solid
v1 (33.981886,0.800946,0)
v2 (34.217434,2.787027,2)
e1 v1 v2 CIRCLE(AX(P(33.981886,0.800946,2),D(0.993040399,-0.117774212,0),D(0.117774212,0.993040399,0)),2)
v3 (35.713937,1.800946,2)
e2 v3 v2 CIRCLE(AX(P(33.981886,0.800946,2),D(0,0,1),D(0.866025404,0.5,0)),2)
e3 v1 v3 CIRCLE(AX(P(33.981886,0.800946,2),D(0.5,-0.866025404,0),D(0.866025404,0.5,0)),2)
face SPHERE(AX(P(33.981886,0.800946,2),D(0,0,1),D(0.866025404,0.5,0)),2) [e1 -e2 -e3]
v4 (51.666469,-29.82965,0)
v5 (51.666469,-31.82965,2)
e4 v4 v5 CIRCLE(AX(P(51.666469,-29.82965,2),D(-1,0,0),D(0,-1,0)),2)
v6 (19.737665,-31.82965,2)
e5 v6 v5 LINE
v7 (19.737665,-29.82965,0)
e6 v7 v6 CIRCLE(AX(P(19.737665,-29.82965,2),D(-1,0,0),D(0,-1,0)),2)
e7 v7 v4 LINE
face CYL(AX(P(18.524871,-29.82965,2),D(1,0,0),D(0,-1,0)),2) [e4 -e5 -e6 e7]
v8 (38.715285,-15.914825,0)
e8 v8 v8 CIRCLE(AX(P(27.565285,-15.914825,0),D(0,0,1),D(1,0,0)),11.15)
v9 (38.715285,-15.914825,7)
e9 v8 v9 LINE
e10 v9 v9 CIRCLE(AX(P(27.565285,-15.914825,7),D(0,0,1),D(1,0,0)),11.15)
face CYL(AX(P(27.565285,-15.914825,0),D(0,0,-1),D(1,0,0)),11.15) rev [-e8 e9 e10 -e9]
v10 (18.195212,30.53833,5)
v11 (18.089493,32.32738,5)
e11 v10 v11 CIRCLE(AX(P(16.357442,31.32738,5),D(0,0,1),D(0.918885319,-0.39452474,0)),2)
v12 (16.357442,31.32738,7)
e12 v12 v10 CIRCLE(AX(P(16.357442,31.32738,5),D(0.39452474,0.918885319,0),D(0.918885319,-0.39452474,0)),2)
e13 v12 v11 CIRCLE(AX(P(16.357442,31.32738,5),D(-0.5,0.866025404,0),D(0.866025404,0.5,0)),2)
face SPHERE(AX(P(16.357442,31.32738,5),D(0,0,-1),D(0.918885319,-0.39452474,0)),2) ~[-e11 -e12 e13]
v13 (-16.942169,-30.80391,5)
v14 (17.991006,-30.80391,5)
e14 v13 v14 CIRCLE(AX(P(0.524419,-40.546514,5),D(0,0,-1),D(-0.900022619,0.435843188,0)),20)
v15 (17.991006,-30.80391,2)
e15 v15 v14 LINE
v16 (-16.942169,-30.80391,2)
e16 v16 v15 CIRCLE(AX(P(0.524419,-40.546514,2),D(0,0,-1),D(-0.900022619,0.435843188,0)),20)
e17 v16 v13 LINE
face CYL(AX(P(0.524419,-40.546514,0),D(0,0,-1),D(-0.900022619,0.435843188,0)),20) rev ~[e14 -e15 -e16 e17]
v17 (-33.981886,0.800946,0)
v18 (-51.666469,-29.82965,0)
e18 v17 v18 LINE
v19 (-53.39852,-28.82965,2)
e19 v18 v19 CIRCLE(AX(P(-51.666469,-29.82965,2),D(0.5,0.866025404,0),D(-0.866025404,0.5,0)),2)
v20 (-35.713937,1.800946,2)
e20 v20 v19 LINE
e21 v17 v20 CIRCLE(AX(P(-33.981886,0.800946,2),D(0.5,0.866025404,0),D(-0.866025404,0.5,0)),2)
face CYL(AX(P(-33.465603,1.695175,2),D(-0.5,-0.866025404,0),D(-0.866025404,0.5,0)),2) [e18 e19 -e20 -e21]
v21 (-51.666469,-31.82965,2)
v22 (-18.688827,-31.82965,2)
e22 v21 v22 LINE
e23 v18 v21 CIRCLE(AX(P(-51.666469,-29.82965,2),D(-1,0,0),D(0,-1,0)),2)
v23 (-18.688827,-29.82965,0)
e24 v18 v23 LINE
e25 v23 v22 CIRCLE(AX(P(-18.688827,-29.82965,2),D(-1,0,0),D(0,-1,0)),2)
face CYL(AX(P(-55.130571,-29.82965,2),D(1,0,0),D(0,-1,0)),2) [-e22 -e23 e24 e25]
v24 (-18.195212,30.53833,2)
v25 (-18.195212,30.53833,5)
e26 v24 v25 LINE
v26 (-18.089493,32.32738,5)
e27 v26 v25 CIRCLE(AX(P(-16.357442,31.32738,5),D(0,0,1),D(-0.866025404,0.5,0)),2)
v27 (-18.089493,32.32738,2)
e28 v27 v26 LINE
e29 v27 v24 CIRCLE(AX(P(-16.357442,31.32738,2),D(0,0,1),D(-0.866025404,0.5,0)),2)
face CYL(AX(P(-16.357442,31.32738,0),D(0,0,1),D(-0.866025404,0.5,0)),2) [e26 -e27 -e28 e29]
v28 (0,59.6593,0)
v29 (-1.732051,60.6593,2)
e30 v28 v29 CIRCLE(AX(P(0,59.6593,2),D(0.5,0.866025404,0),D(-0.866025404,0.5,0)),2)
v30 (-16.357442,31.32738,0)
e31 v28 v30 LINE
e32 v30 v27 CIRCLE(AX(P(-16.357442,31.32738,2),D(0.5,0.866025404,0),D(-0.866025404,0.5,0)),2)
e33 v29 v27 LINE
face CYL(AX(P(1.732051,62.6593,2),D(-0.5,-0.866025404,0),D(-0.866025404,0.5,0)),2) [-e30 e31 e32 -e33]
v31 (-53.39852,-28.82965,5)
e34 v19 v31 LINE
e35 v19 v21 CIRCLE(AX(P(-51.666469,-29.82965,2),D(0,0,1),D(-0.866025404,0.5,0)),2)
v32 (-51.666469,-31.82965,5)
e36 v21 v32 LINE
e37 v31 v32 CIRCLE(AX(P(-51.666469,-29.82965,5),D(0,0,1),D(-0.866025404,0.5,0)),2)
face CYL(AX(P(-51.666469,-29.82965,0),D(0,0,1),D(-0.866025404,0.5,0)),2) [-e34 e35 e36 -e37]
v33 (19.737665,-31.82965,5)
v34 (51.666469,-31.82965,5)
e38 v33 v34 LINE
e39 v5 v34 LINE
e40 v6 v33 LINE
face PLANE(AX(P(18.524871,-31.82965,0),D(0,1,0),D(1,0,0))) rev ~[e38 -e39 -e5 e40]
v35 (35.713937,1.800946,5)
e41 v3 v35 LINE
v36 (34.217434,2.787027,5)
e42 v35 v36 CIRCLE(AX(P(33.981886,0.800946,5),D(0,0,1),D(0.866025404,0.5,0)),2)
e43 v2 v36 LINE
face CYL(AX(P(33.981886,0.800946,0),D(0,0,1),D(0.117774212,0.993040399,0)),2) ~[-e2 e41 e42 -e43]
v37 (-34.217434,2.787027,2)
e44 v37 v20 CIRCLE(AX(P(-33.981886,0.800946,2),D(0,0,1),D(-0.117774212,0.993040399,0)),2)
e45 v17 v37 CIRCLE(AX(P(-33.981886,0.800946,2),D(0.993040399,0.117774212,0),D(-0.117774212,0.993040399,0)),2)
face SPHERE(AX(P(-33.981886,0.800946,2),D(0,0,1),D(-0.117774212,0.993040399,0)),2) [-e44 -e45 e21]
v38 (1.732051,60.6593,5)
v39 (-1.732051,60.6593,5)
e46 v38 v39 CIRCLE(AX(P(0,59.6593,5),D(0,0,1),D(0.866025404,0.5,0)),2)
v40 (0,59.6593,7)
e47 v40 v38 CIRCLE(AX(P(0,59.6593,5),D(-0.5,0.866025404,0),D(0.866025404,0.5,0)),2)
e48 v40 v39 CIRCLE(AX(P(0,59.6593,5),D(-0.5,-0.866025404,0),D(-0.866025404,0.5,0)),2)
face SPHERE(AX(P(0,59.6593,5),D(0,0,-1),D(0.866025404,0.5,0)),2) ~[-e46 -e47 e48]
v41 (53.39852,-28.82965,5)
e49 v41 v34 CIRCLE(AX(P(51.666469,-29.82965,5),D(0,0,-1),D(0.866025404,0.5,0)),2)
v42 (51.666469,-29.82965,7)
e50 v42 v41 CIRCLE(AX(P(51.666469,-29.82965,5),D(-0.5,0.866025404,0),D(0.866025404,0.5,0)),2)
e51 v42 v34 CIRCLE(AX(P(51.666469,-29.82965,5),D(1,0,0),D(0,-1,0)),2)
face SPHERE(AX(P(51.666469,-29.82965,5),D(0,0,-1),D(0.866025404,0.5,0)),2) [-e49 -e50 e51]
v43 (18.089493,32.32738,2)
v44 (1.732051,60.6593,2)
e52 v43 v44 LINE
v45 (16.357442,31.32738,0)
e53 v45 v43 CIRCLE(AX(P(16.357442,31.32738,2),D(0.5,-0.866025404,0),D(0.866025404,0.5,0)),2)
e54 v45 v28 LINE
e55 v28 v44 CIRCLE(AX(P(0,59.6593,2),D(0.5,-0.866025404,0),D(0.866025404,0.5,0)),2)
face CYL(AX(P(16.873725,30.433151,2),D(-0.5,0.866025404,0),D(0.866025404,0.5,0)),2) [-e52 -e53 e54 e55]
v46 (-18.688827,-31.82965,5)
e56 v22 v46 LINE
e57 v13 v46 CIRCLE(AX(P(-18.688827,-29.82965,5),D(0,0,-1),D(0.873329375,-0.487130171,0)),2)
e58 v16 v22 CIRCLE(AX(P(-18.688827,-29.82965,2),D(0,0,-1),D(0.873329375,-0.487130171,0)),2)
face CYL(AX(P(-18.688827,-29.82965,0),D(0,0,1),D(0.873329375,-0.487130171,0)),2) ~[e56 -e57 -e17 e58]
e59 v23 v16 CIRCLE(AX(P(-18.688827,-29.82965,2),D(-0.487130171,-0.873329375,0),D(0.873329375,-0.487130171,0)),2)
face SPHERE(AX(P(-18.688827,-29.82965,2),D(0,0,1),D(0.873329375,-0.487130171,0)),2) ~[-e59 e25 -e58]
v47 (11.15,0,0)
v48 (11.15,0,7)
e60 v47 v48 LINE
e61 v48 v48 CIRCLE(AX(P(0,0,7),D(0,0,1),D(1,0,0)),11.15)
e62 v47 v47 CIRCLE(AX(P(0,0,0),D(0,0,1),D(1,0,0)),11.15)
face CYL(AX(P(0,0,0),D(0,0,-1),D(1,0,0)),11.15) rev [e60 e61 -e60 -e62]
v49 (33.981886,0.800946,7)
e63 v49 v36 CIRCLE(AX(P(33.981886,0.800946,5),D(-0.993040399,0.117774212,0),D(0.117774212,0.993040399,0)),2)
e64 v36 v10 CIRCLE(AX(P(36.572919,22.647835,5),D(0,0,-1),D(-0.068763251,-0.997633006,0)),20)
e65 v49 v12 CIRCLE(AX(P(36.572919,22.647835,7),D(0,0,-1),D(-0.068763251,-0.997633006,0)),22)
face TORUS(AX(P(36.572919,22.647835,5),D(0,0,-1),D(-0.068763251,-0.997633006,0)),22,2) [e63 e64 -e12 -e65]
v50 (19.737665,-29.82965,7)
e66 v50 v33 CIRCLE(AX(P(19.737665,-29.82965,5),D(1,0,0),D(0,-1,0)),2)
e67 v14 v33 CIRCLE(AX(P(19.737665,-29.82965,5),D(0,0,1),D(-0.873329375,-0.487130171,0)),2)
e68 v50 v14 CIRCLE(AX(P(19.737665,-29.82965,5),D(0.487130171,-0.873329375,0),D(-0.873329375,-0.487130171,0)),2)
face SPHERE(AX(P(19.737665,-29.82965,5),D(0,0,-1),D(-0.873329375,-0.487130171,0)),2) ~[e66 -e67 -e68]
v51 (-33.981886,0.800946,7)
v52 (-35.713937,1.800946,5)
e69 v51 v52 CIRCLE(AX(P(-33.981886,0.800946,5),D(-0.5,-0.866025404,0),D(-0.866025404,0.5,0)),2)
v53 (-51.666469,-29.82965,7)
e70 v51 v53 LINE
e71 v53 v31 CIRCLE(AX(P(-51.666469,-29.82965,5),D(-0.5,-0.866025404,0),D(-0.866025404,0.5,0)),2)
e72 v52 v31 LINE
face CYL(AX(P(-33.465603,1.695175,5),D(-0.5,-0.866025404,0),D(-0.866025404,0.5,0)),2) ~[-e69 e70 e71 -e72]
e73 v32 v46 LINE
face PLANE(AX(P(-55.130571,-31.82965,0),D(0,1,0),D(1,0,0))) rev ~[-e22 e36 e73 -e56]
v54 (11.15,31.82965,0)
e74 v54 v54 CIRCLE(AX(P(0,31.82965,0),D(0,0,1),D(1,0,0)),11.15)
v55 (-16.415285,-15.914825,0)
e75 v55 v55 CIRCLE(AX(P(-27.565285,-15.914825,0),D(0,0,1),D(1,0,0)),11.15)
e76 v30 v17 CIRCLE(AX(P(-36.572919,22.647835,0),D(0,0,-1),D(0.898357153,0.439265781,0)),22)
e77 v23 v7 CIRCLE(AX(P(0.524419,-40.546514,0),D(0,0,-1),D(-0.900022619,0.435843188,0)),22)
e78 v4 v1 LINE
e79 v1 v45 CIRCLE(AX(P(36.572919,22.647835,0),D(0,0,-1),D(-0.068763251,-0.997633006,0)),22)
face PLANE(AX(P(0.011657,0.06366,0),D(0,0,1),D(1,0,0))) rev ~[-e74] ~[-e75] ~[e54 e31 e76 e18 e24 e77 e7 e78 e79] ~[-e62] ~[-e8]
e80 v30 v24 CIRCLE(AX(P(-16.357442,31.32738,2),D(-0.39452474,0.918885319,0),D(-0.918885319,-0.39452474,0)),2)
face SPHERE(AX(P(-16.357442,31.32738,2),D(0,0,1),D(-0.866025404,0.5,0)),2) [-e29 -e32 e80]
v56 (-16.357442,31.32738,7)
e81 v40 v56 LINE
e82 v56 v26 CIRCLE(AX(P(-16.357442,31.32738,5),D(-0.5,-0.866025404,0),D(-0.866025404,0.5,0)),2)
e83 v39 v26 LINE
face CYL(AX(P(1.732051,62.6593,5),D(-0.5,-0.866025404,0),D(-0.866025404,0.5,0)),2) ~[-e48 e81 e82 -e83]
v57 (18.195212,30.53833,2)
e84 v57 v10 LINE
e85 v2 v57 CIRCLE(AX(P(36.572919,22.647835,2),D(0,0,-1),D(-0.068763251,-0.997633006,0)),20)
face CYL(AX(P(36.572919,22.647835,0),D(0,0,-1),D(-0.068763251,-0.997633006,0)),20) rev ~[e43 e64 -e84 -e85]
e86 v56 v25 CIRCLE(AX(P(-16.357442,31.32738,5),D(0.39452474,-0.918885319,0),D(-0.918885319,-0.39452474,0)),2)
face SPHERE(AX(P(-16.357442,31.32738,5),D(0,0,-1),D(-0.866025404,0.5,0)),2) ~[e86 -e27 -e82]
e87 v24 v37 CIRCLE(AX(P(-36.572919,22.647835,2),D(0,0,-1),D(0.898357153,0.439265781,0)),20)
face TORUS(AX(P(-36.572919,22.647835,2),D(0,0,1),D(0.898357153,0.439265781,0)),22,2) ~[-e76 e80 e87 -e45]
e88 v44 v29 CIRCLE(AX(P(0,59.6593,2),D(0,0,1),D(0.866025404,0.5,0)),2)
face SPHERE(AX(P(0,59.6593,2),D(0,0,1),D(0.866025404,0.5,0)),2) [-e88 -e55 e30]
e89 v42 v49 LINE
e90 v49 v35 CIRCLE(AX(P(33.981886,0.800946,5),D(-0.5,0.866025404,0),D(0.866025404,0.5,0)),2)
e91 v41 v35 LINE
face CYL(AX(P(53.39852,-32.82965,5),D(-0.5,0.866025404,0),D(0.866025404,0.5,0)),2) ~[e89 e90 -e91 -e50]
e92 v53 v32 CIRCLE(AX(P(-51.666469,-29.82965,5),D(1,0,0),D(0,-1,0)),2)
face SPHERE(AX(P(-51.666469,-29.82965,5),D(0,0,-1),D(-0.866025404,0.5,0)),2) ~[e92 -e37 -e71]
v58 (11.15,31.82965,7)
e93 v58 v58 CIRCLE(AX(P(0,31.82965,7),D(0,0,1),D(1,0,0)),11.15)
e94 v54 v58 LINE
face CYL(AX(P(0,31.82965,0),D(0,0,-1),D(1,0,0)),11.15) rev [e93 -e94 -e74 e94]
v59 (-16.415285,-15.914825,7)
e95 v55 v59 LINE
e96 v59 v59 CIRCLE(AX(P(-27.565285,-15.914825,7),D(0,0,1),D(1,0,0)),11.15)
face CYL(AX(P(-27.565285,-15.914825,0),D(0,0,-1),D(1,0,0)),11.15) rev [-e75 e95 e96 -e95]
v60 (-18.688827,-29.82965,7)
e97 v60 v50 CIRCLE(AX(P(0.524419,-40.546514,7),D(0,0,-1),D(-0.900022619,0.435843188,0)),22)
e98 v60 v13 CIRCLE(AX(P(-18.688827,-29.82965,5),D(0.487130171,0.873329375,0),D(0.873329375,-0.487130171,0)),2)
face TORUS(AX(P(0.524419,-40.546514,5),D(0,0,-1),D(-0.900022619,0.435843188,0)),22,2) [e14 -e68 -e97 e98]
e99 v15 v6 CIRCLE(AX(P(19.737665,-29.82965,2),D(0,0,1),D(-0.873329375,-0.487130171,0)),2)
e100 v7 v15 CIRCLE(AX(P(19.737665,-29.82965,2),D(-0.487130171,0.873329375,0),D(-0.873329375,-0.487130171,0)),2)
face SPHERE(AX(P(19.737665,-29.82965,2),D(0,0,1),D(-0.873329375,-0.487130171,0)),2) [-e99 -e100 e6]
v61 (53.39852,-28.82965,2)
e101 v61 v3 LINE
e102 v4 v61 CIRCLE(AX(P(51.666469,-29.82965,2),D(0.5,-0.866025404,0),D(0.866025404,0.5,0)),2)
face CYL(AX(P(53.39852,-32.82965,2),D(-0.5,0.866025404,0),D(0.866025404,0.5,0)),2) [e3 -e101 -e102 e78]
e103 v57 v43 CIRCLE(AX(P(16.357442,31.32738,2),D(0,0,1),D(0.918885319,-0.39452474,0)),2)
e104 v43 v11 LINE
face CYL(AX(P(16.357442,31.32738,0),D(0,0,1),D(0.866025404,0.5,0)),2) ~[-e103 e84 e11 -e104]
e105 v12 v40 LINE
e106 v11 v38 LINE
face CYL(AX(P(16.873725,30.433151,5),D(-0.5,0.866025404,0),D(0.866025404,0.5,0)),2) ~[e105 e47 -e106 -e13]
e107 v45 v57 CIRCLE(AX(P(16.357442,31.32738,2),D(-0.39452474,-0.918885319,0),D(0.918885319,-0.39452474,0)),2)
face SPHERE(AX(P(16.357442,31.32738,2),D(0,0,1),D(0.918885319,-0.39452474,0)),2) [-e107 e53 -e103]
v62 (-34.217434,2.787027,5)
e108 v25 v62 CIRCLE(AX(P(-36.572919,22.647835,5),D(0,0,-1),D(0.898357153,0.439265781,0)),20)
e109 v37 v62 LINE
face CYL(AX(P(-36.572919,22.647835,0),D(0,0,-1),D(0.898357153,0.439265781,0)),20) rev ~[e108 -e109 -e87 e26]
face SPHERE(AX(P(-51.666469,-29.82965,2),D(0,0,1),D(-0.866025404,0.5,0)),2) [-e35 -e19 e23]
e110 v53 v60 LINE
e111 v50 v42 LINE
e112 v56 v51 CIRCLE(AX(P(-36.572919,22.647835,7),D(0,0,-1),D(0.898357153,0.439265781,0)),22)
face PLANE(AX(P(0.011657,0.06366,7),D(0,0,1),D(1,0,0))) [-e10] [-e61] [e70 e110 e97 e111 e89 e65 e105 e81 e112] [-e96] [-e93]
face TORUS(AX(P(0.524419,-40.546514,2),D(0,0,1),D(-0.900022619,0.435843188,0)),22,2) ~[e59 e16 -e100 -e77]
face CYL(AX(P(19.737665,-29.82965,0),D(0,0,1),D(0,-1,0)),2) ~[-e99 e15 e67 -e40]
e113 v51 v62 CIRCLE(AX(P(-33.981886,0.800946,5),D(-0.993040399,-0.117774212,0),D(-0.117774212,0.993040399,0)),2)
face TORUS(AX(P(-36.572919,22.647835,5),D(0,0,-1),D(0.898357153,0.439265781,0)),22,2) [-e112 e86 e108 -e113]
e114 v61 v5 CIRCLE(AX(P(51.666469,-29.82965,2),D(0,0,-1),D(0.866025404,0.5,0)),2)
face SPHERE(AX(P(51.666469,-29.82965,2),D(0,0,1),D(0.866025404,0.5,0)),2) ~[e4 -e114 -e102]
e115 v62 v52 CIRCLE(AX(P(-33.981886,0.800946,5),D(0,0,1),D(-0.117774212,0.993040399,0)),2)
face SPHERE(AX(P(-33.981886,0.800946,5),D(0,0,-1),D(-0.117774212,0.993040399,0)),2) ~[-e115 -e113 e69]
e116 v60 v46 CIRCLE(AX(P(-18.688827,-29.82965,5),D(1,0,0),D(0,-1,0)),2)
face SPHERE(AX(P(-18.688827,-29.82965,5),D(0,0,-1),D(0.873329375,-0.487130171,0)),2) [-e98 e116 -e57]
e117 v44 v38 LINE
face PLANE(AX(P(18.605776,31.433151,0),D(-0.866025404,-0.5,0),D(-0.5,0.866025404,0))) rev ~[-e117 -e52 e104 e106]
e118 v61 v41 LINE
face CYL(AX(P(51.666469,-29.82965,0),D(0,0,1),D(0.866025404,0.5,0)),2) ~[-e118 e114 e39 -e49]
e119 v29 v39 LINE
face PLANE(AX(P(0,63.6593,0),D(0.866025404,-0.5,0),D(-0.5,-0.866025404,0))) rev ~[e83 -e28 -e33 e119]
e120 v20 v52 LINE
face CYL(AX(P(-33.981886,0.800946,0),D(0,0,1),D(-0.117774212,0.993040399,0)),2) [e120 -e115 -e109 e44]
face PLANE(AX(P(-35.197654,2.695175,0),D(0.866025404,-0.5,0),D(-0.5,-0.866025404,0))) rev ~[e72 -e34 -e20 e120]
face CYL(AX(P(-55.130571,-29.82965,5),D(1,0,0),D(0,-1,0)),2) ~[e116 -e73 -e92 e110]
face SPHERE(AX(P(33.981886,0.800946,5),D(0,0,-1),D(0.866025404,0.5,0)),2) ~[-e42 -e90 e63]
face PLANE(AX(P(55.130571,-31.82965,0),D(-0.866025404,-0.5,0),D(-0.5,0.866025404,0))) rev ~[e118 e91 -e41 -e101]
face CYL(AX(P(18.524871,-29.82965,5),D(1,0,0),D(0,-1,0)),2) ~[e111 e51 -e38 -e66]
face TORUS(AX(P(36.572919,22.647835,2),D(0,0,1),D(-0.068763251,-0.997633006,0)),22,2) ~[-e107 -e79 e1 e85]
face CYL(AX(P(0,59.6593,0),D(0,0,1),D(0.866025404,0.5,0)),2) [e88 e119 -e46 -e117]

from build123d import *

# Parameters (mm, degrees)
F0_R     = 11.15
F1_DEPTH = 7
F2_R     = 2


# Not quite as in the source:
# - a feature names something its author has since deleted; it is built from what else it names


with BuildPart() as f1:
    # F0 (on Top) → F1 (new body)
    with BuildSketch(Plane.XY):
        with BuildLine():
            Line((18.6057756776, 31.4331508418), (0, 63.6592996296))
            Line((0, 63.6592996296), (-18.6057756776, 31.4331508418))
            ThreePointArc((-18.6057756776, 31.4331508418), (-19.2524106529, 12.6478352194), (-35.1976537124, 2.6951750926))
            Line((-35.1976537124, 2.6951750926), (-55.1305706664, -31.8296498148))
            Line((-55.1305706664, -31.8296498148), (-17.4760334194, -31.8296498148))
            ThreePointArc((-17.4760334194, -31.8296498148), (0.5244189685, -20.546513576), (18.5248713564, -31.8296498148))
            Line((18.5248713564, -31.8296498148), (55.1305706664, -31.8296498148))
            Line((55.1305706664, -31.8296498148), (35.1976537124, 2.6951750926))
            ThreePointArc((35.1976537124, 2.6951750926), (19.2524106529, 12.6478352194), (18.6057756776, 31.4331508418))
        make_face()
        with Locations((-27.5652853332, -15.9148249074)):
            Circle(F0_R, mode=Mode.SUBTRACT)
        with Locations((27.5652853332, -15.9148249074)):
            Circle(F0_R, mode=Mode.SUBTRACT)
        Circle(F0_R, mode=Mode.SUBTRACT)
        with Locations((0, 31.8296498148)):
            Circle(F0_R, mode=Mode.SUBTRACT)
    extrude(amount=F1_DEPTH)

    # F2
    f2_edges = [f1.edges().sort_by_distance(p)[0] for p in [
        (55.130571, -31.82965, 3.5),
        (35.197654, 2.695175, 3.5),
        (45.164112, -14.567237, 0),
        (45.164112, -14.567237, 7),
        (18.605776, 31.433151, 3.5),
        (19.252411, 12.647835, 0),
        (19.252411, 12.647835, 7),
        (0, 63.6593, 3.5),
        (9.302888, 47.546225, 0),
        (9.302888, 47.546225, 7),
        (-18.605776, 31.433151, 3.5),
        (-9.302888, 47.546225, 0),
        (-9.302888, 47.546225, 7),
        (-35.197654, 2.695175, 3.5),
        (-19.252411, 12.647835, 0),
        (-19.252411, 12.647835, 7),
        (-55.130571, -31.82965, 3.5),
        (-45.164112, -14.567237, 0),
        (-45.164112, -14.567237, 7),
        (-17.476033, -31.82965, 3.5),
        (18.524871, -31.82965, 3.5),
        (0.524419, -20.546514, 0),
        (0.524419, -20.546514, 7),
        (-36.303302, -31.82965, 0),
        (-36.303302, -31.82965, 7),
        (36.827721, -31.82965, 0),
        (36.827721, -31.82965, 7),
    ]]
    fillet(f2_edges, radius=F2_R)


solid = f1.part
